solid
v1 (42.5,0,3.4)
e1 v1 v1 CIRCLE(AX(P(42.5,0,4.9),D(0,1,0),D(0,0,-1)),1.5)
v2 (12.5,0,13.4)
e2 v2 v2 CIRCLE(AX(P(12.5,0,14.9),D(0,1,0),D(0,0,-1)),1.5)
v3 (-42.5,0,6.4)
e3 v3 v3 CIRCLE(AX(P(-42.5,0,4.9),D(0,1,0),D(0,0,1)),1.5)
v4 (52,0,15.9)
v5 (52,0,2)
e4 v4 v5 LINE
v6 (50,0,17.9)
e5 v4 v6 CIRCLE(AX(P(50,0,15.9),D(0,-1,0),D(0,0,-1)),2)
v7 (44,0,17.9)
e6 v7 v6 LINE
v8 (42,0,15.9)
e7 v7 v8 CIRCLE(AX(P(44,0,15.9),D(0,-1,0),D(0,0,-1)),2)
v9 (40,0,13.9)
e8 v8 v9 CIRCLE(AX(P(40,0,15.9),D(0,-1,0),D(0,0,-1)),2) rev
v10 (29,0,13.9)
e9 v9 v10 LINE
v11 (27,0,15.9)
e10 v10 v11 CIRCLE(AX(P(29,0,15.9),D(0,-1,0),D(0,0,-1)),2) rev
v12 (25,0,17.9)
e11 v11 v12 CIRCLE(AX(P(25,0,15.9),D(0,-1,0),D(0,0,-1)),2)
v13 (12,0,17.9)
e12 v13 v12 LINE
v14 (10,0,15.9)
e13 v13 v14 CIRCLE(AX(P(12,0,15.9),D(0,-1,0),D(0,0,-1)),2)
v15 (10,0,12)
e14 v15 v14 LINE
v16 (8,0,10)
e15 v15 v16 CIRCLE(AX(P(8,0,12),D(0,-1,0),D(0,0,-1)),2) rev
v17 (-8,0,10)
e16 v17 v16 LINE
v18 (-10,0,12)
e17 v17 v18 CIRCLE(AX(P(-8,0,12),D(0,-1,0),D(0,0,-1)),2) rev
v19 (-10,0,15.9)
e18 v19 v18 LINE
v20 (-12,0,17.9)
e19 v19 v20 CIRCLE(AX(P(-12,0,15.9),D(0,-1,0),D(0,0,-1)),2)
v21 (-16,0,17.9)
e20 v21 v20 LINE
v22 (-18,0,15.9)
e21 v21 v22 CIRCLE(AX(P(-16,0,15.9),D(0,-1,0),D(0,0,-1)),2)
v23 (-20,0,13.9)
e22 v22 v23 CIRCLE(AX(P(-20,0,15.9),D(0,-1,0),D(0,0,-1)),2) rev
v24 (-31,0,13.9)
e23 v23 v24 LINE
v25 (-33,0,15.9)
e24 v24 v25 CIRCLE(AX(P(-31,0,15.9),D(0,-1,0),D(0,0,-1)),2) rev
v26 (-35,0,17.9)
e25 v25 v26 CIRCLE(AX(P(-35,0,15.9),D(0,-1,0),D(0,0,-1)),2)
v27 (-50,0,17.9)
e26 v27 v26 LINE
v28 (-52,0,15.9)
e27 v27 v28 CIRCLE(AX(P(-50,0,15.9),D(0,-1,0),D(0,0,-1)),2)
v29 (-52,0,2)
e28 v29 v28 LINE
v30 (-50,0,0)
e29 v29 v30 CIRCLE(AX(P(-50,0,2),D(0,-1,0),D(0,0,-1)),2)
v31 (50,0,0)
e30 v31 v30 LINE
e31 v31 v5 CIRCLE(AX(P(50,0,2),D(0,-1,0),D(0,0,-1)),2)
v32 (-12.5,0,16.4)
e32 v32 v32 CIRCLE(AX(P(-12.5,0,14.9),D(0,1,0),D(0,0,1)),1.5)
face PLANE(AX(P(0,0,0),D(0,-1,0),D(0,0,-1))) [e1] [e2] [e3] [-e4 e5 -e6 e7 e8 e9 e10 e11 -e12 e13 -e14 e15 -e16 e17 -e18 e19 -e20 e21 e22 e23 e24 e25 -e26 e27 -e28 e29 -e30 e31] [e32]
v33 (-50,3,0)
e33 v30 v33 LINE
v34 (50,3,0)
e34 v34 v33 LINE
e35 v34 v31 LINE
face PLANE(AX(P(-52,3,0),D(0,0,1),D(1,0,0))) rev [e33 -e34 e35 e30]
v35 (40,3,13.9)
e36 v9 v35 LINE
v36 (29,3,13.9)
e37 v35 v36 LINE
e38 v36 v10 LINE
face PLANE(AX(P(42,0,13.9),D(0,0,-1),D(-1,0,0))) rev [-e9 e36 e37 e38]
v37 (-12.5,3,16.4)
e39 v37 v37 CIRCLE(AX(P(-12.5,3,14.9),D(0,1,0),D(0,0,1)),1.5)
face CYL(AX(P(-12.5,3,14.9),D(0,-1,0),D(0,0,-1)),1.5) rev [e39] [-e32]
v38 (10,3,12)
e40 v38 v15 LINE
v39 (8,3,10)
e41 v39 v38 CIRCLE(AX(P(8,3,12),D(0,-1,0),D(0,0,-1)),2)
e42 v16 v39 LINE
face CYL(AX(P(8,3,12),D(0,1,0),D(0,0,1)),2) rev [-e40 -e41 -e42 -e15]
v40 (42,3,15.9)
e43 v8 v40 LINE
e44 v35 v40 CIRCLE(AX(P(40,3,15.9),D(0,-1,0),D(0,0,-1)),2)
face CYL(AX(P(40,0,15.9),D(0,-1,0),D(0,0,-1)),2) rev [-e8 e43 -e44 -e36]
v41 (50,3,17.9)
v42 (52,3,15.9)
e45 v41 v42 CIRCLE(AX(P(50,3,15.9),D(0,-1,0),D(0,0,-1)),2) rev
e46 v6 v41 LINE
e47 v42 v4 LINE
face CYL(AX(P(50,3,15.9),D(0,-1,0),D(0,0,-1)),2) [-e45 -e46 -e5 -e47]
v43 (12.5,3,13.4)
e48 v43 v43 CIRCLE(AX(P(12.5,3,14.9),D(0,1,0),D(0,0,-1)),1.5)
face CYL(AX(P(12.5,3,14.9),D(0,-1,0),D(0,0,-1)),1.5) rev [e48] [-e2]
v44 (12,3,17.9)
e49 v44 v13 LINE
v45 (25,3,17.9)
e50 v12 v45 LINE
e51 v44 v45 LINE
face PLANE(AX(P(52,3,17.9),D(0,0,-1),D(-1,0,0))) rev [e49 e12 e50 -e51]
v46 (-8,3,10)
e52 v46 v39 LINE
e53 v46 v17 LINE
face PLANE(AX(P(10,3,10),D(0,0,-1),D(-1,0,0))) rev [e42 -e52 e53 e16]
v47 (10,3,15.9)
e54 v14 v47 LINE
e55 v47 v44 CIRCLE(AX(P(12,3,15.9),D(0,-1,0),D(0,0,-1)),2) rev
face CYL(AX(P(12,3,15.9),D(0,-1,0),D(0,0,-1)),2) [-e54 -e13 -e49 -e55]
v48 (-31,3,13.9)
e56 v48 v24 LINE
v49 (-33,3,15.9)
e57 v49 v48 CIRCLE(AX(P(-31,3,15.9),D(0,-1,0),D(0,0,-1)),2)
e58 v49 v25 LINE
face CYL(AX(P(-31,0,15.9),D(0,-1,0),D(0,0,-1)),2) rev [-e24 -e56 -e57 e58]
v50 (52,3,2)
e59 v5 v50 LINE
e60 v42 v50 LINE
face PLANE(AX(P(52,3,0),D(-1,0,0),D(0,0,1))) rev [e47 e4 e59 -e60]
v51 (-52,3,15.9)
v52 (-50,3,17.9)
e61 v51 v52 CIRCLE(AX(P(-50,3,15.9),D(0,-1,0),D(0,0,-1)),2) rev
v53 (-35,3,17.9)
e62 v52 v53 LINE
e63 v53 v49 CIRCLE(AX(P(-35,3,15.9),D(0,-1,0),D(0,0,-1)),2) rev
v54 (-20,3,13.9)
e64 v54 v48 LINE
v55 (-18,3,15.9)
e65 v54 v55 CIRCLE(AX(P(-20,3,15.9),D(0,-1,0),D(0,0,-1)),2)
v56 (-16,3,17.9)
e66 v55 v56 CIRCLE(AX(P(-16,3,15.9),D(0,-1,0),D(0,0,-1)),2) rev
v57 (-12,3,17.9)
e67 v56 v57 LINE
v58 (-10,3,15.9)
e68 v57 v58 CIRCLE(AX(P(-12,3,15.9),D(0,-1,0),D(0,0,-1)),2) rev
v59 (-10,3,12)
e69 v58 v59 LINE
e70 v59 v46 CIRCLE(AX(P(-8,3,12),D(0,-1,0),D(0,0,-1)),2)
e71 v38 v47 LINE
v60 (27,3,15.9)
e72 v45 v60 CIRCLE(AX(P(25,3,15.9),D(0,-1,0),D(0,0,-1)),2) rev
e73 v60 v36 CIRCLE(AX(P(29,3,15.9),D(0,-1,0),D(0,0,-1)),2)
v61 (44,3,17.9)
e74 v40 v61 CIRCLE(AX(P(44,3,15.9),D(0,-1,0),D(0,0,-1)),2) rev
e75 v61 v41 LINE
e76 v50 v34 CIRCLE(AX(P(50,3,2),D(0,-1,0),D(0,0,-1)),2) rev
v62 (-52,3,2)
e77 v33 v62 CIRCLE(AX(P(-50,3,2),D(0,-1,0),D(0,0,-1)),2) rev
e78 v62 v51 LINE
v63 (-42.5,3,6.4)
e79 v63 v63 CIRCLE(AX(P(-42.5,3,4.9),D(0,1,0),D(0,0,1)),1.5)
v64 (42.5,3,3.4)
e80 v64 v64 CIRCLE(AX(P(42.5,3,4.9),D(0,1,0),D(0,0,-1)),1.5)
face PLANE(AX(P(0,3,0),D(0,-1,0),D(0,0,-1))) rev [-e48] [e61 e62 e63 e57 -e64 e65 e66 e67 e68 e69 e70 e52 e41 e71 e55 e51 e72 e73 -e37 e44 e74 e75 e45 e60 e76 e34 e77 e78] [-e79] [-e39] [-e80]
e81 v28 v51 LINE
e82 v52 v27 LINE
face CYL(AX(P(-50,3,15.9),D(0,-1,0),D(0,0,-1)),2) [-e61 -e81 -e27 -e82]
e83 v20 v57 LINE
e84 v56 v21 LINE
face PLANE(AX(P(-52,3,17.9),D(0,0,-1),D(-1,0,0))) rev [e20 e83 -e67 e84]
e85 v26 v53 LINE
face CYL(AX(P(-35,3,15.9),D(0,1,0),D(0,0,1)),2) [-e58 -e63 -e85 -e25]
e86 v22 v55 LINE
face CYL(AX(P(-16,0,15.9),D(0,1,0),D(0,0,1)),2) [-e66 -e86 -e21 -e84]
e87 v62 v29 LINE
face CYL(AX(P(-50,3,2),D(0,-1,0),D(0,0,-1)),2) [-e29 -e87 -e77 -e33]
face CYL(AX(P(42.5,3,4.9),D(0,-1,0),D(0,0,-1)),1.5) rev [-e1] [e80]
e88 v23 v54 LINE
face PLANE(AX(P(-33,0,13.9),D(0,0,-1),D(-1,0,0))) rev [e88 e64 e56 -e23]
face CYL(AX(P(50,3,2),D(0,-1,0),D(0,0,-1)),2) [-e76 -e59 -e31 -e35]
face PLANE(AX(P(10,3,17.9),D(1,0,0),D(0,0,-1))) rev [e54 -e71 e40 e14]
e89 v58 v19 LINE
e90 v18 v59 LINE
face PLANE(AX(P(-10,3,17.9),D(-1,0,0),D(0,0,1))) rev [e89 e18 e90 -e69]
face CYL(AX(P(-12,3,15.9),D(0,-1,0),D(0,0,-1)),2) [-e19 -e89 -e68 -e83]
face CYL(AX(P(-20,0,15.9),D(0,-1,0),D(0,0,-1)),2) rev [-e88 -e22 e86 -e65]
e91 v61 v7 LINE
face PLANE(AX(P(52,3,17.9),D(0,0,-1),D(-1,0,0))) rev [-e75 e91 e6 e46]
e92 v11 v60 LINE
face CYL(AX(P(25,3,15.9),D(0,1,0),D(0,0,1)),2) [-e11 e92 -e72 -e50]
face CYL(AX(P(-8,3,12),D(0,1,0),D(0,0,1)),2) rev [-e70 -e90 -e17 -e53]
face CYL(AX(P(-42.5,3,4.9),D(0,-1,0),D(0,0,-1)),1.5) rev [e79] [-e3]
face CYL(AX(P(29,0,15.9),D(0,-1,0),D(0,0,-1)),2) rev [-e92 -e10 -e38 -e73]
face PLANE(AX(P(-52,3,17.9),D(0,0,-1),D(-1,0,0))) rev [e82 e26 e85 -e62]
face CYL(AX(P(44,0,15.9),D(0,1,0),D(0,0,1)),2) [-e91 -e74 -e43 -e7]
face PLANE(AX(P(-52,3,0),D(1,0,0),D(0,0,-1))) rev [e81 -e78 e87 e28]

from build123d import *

# Parameters (mm, degrees)
SKETCH_1_R          = 1.5
EXTRUDE_1_DEPTH     = 3
SKETCH_2_W          = 15
SKETCH_2_H          = 4
CUT_EXTRUDE_1_DEPTH = 3
FILLET_1_R          = 2


with BuildPart() as part:
    # 草图1 → 凸台-拉伸1 (new body)
    with BuildSketch(Plane(origin=(0, 0, 0), x_dir=(1, 0, 0), z_dir=(0, 1, 0))):
        Polygon((-52, 0), (52, 0), (52, -17.9), (10, -17.9), (10, -10), (-10, -10), (-10, -17.9), (-52, -17.9), align=None)
        with Locations(Location((-12.5, -14.9, 0), (0, 0, 270))):
            Circle(SKETCH_1_R, mode=Mode.SUBTRACT)
        with Locations(Location((12.5, -14.9, 0), (0, 0, 90))):
            Circle(SKETCH_1_R, mode=Mode.SUBTRACT)
        with Locations(Location((-42.5, -4.9, 0), (0, 0, 270))):
            Circle(SKETCH_1_R, mode=Mode.SUBTRACT)
        with Locations(Location((42.5, -4.9, 0), (0, 0, 90))):
            Circle(SKETCH_1_R, mode=Mode.SUBTRACT)
    extrude(amount=EXTRUDE_1_DEPTH)

    # 草图2 → 切除-拉伸1 (cut)
    with BuildSketch(Plane(origin=(0, 3, 0), x_dir=(1, 0, 0), z_dir=(0, 1, 0))):
        with Locations((-25.5, -15.9)):
            Rectangle(SKETCH_2_W, SKETCH_2_H)
        with Locations((34.5, -15.9)):
            Rectangle(SKETCH_2_W, SKETCH_2_H)
    extrude(amount=-CUT_EXTRUDE_1_DEPTH, mode=Mode.SUBTRACT)

    # 圆角1
    fillet_1_edges = [part.edges().sort_by_distance(p)[0] for p in [
        (52, 1.5, 17.9),
        (10, 1.5, 17.9),
        (10, 1.5, 10),
        (-10, 1.5, 10),
        (-10, 1.5, 17.9),
        (-52, 1.5, 17.9),
        (52, 1.5, 0),
        (-52, 1.5, 0),
        (-33, 1.5, 13.9),
        (-18, 1.5, 13.9),
        (-18, 1.5, 17.9),
        (27, 1.5, 17.9),
        (27, 1.5, 13.9),
        (42, 1.5, 13.9),
        (42, 1.5, 17.9),
        (-33, 1.5, 17.9),
    ]]
    fillet(fillet_1_edges, radius=FILLET_1_R - 0.0001)  # a hair under: the kernel refuses the full size


solid = part.part
